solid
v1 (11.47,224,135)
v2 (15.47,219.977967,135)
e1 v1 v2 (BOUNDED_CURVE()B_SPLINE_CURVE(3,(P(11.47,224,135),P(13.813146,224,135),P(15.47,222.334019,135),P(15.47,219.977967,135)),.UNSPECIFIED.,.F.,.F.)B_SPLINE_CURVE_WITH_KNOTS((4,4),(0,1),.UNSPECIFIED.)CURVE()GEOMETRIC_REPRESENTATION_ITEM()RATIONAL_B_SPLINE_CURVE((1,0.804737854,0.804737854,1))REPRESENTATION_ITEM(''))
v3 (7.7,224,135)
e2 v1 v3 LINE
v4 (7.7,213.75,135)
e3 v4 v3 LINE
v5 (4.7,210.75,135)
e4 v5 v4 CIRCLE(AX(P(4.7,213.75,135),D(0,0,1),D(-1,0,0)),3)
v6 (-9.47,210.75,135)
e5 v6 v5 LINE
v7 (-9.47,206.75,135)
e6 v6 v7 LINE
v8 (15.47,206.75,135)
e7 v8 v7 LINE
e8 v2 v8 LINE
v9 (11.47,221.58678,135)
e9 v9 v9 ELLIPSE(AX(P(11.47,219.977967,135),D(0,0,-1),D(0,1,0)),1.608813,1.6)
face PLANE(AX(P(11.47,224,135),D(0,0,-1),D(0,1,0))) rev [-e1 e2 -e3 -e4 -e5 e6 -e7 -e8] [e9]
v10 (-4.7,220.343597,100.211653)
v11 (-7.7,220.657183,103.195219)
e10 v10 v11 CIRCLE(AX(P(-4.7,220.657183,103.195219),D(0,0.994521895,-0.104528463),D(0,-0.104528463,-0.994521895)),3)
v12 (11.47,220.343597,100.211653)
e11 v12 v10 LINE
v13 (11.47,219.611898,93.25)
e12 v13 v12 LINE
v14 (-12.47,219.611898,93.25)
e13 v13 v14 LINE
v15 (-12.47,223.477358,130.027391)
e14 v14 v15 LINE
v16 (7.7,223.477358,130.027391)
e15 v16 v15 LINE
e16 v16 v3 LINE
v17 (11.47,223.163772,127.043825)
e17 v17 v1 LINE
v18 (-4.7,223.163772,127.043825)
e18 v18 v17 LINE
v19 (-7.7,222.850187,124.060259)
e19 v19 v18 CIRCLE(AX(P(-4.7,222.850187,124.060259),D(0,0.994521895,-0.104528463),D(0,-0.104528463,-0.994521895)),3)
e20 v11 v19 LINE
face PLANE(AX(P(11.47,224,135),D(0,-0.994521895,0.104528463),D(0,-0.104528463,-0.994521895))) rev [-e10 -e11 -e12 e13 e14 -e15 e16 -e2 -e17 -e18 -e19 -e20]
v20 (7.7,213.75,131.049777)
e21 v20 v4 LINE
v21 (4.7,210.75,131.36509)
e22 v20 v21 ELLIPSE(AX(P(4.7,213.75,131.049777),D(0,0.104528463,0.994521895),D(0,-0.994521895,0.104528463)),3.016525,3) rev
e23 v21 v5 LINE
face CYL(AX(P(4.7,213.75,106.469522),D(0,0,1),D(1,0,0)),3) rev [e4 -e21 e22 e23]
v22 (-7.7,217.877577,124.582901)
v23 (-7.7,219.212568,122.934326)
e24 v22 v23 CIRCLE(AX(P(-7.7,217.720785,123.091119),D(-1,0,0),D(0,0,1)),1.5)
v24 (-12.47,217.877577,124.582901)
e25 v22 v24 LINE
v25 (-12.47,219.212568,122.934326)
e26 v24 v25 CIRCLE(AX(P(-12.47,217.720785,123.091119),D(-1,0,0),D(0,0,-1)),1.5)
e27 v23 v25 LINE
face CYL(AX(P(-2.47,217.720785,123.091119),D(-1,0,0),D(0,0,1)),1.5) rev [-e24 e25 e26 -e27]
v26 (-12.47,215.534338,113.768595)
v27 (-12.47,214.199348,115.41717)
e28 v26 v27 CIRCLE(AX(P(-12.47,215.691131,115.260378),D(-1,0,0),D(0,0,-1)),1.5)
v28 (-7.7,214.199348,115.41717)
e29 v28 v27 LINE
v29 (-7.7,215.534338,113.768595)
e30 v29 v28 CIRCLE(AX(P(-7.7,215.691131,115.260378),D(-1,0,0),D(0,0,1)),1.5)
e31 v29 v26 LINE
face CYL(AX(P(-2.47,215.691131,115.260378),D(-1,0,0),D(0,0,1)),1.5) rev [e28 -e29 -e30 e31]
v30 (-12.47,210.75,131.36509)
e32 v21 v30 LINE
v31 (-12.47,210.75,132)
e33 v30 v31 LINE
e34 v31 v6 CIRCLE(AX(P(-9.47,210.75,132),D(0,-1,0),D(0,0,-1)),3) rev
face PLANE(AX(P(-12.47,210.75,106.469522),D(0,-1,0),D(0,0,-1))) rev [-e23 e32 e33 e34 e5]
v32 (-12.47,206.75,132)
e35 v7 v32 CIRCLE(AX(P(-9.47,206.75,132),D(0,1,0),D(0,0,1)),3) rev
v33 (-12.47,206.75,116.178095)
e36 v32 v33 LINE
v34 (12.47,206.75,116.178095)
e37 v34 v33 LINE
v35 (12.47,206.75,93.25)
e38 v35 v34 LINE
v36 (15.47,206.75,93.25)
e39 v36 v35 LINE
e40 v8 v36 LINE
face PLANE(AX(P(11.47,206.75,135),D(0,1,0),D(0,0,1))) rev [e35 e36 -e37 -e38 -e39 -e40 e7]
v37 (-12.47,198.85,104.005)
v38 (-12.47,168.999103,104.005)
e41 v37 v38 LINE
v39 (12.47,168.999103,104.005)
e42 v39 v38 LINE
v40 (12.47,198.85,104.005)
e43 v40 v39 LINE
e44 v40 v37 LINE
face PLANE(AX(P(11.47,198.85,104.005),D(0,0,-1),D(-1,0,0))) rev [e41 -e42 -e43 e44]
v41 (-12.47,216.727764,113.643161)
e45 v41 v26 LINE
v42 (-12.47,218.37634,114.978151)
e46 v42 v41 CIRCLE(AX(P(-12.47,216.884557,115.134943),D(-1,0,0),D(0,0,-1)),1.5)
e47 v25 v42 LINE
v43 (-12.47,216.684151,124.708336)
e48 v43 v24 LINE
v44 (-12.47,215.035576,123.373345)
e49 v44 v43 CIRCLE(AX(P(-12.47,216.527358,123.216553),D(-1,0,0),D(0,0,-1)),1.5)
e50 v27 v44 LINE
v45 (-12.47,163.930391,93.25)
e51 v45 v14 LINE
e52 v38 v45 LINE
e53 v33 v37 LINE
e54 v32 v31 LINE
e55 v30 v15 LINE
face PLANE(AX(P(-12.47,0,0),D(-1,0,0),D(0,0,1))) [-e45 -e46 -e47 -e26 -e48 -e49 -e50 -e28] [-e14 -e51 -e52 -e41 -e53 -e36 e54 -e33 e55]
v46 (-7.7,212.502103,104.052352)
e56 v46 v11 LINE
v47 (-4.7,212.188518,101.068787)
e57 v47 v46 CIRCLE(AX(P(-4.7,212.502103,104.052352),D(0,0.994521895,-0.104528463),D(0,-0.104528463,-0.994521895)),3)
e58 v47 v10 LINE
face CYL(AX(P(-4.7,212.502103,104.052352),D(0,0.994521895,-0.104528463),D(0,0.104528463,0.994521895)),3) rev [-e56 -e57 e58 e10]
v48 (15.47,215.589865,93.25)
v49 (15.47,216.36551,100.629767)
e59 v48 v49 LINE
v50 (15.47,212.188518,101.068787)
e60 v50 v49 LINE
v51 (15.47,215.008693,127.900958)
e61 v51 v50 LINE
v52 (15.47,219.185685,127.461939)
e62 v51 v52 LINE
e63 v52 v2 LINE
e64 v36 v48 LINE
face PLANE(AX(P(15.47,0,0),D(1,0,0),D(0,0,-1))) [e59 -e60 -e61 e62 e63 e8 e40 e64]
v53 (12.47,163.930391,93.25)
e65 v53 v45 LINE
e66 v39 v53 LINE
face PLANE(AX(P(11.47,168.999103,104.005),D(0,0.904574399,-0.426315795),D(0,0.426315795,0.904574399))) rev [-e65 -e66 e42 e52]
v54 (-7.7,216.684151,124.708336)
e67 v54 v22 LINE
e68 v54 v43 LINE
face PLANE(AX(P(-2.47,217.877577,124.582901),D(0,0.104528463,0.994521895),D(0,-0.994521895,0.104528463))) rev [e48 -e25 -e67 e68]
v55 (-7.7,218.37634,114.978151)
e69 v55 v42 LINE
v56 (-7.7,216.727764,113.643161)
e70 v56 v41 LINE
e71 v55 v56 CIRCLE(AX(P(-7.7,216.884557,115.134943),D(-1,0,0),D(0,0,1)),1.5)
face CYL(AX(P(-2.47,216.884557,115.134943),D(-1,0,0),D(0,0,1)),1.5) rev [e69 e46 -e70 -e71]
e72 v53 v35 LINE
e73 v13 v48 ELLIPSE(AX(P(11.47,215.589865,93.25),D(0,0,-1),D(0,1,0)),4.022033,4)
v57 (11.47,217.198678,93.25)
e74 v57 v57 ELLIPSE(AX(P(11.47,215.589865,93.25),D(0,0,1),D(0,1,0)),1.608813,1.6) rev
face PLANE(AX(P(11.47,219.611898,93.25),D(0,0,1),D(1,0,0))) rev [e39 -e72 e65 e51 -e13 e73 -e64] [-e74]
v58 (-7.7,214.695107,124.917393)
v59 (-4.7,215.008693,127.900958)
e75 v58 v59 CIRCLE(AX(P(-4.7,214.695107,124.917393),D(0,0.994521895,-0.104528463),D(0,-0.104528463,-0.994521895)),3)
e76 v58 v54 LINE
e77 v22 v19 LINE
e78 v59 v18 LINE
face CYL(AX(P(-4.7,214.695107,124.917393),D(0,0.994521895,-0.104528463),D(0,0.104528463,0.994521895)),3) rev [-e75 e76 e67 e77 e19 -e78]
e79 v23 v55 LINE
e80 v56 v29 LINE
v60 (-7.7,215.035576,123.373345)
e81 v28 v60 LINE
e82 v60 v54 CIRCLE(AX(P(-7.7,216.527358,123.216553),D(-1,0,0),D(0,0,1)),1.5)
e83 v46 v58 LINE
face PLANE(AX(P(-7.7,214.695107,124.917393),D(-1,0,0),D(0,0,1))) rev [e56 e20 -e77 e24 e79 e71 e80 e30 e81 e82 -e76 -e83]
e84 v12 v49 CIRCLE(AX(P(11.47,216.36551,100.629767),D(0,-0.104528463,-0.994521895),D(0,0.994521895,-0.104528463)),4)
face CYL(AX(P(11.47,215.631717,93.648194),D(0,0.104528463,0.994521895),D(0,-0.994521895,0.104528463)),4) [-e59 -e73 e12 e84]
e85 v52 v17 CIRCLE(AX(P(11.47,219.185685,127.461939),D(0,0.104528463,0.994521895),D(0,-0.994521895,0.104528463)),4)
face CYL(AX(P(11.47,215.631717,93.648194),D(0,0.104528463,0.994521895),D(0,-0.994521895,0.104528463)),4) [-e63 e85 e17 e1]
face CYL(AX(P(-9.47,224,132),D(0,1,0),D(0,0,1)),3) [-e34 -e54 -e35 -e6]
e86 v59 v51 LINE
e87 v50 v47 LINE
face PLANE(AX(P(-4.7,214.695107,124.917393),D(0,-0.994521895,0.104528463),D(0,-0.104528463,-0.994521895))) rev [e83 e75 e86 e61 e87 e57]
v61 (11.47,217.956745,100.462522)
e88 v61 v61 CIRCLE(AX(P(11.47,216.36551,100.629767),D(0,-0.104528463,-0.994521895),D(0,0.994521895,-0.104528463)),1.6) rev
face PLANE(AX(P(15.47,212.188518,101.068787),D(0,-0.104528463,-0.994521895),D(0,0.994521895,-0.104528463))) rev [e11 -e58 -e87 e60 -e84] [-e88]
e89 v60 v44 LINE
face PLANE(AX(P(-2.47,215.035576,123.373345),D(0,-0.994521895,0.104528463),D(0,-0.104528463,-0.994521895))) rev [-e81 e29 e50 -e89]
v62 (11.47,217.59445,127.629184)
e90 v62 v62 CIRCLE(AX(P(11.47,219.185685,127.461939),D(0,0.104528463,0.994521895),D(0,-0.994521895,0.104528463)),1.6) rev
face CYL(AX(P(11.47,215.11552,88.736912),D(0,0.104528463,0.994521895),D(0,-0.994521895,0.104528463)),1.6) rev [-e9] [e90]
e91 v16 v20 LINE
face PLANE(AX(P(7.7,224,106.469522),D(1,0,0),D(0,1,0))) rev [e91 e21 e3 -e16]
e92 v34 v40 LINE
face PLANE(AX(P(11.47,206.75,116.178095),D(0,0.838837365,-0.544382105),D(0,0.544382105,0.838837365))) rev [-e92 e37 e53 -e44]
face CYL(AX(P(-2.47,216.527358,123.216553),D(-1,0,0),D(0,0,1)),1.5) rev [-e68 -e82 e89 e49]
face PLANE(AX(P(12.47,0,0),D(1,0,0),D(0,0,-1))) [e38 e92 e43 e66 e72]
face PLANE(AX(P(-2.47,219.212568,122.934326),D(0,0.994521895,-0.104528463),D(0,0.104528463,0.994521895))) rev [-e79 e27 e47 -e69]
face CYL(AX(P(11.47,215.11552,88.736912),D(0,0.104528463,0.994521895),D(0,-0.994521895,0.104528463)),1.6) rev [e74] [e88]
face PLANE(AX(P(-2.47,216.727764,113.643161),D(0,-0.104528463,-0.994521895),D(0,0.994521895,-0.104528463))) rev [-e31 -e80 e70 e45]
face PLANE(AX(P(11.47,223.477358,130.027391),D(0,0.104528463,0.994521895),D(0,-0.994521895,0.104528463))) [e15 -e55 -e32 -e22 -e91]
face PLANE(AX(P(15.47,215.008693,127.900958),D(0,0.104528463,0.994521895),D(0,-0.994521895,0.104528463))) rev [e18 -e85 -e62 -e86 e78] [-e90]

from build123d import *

# Parameters (mm, degrees)
EXTRUDE_START         = -12.47
EXTRUDE_1_DEPTH       = 23.94
EXTRUDE_START_2       = -42.420417041
EXTRUDE_3_DEPTH       = 42.420417041
EXTRUDE_START_3       = 135
EXTRUDE_3_2_OUTLINE_W = 5.53
EXTRUDE_3_2_OUTLINE_H = 12
EXTRUDE_3_2_DEPTH     = 1
EXTRUDE_START_4       = 92.811966442
EXTRUDE_3_3_OUTLINE_W = 5.53
EXTRUDE_3_3_OUTLINE_H = 12
EXTRUDE_3_3_DEPTH     = 0.418113953
SKETCH_3_W            = 8.92360814
SKETCH_3_H            = 8.098758973
CUT_EXTRUDE_1_DEPTH   = 24.94
EXTRUDE_4_DEPTH       = 4
EXTRUDE_5_DEPTH       = 1
FILLET_1_R            = 3
CUT_EXTRUDE_START     = -12.47
CUT_EXTRUDE_4_DEPTH   = 20.17
CUT_EXTRUDE_START_2   = 130.027390523
CUT_EXTRUDE_4_2_DEPTH = 4.972609477
CUT_EXTRUDE_5_REACH   = 78.971
SKETCH_6_R            = 1.6
CUT_EXTRUDE_6_DEPTH   = 8.2
CUT_EXTRUDE_8_DEPTH   = 10


with BuildPart() as part:
    # 草图1 → 凸台-拉伸1 (new body)
    with BuildSketch(Plane(origin=(0, 0, 0), x_dir=(0, 0, -1), z_dir=(1, 0, 0)).offset(EXTRUDE_START)):
        Polygon((-135, 224), (-135, 206.75), (-116.178095192, 206.75), (-104.005, 198.85), (-104.005, 168.99910251), (-93.25, 163.930391323), (-93.25, 219.611898178), align=None)
    extrude(amount=EXTRUDE_1_DEPTH)

    # 凸台-拉伸3: read off the stored shape, not the designer's step
    # 凸台-拉伸3 outline → 凸台-拉伸3 (add)
    with BuildSketch(Plane(origin=(11.47, 224, 135), x_dir=(1, 0, 0), z_dir=(0, 0.10452846326765014, 0.9945218953682736)).offset(EXTRUDE_START_2)):
        with BuildLine():
            Line((0, 0), (0, -4))
            Line((0, -4), (4, -4))
            ThreePointArc((4, -4), (2.828427125, -1.171572875), (0, 0))
        make_face()
    extrude(amount=EXTRUDE_3_DEPTH)

    # Extrude 3 2 outline → Extrude 3 2 (cut)
    with BuildSketch(Plane.XY.offset(EXTRUDE_START_3)):
        with Locations((14.235, 220)):
            Rectangle(EXTRUDE_3_2_OUTLINE_W, EXTRUDE_3_2_OUTLINE_H)
    extrude(amount=EXTRUDE_3_2_DEPTH, mode=Mode.SUBTRACT)

    # Extrude 3 3 outline → Extrude 3 3 (cut)
    with BuildSketch(Plane.XY.offset(EXTRUDE_START_4)):
        with Locations((14.235, 220)):
            Rectangle(EXTRUDE_3_3_OUTLINE_W, EXTRUDE_3_3_OUTLINE_H)
    extrude(amount=EXTRUDE_3_3_DEPTH, mode=Mode.SUBTRACT)

    # 草图3 → 切除-拉伸1 (cut)
    with BuildSketch(Plane(origin=(0, 0, 93.25), x_dir=(-1, 0, 0), z_dir=(0, 0, -1))):
        with Locations((-14.443820209, 216.390986059)):
            Rectangle(SKETCH_3_W, SKETCH_3_H)
    extrude(amount=CUT_EXTRUDE_1_DEPTH, mode=Mode.SUBTRACT)

    # 草图4 → 凸台-拉伸4 (add)
    with BuildSketch(Plane(origin=(11.47, 0, 0), x_dir=(0, 0, -1), z_dir=(1, 0, 0))):
        Polygon((-93.25, 206.75), (-93.25, 215.589865059), (-135, 219.977966882), (-135, 206.75), align=None)
    extrude(amount=EXTRUDE_4_DEPTH)

    # 草图10 → 凸台-拉伸5 (add)
    with BuildSketch(Plane(origin=(11.47, 0, 0), x_dir=(0, 0, -1), z_dir=(1, 0, 0))):
        Polygon((-93.25, 163.930391323), (-104.005, 168.99910251), (-104.005, 198.85), (-116.178095192, 206.75), (-93.25, 206.75), align=None)
    extrude(amount=EXTRUDE_5_DEPTH)

    # 圆角1
    fillet_1_edges = [part.edges().sort_by_distance(p)[0] for p in [
        (-12.47, 215.375, 135),
    ]]
    fillet(fillet_1_edges, radius=FILLET_1_R)

    # 切除-拉伸4: read off the stored shape, not the designer's step
    # 切除-拉伸4 outline → 切除-拉伸4 (cut)
    with BuildSketch(Plane.YZ.offset(CUT_EXTRUDE_START)):
        Polygon((210.75, 131.365089719), (223.477357684, 130.027390523), (224, 135), (210.75, 135), align=None)
    extrude(amount=CUT_EXTRUDE_4_DEPTH, mode=Mode.SUBTRACT)

    # Cut-Extrude 4 2 outline → Cut-Extrude 4 2 (add)
    with BuildSketch(Plane.XY.offset(CUT_EXTRUDE_START_2)):
        with BuildLine():
            ThreePointArc((7.7, 213.75), (6.821320344, 211.628679656), (4.7, 210.75))
            Line((4.7, 210.75), (7.7, 210.75))
            Line((7.7, 210.75), (7.7, 213.75))
        make_face()
    extrude(amount=CUT_EXTRUDE_4_2_DEPTH)

    # 切除-拉伸5: up to this plane
    cut_extrude_5_end = Plane(origin=(11.47, 219.611898178, 93.25), z_dir=(0, 0, 1))
    # 草图6 → 切除-拉伸5 (cut, up to the surface)
    with BuildSketch(Plane(origin=(11.47, 224, 135), x_dir=(1, 0, 0), z_dir=(0, 0.10452846326765014, 0.9945218953682736)), mode=Mode.PRIVATE) as cut_extrude_5_sk1:
        with Locations(Location((0, -4, 0), (0, 0, 90))):
            Circle(SKETCH_6_R)
    cut_extrude_5_tool1 = split(extrude(cut_extrude_5_sk1.sketch, amount=-CUT_EXTRUDE_5_REACH, mode=Mode.PRIVATE), bisect_by=cut_extrude_5_end, keep=Keep.BOTH, mode=Mode.PRIVATE)
    add(cut_extrude_5_tool1.solids().sort_by_distance((11.47, 220.021912, 135.418114))[0], mode=Mode.SUBTRACT)

    # 草图7 → 切除-拉伸6 (cut)
    with BuildSketch(Plane(origin=(0, 207.518492152, -21.811072421), x_dir=(1, 0, 0), z_dir=(0, 0.9945218953682738, -0.10452846326765014))):
        with BuildLine():
            Line((15.47, -149.674831647), (15.47, -122.694860975))
            Line((15.47, -122.694860975), (-4.7, -122.694860975))
            ThreePointArc((-4.7, -122.694860975), (-6.821320344, -123.573540631), (-7.7, -125.694860975))
            Line((-7.7, -125.694860975), (-7.7, -146.674831647))
            ThreePointArc((-7.7, -146.674831647), (-6.821320344, -148.79615199), (-4.7, -149.674831647))
            Line((-4.7, -149.674831647), (15.47, -149.674831647))
        make_face()
    extrude(amount=-CUT_EXTRUDE_6_DEPTH, mode=Mode.SUBTRACT)

    # 草图9 → 切除-拉伸8 (cut)
    with BuildSketch(Plane.ZY.offset(12.47)):
        with BuildLine():
            Line((122.934325929, 219.212567575), (114.978150766, 218.376339869))
            ThreePointArc((114.978150766, 218.376339869), (113.969224519, 217.828537613), (113.643160618, 216.727764331))
            Line((113.643160618, 216.727764331), (113.768594774, 215.534338057))
            ThreePointArc((113.768594774, 215.534338057), (114.316397031, 214.52541181), (115.417170312, 214.199347909))
            Line((115.417170312, 214.199347909), (123.373345475, 215.035575615))
            ThreePointArc((123.373345475, 215.035575615), (124.382271722, 215.583377871), (124.708335623, 216.684151153))
            Line((124.708335623, 216.684151153), (124.582901467, 217.877577427))
            ThreePointArc((124.582901467, 217.877577427), (124.035099211, 218.886503674), (122.934325929, 219.212567575))
        make_face()
    extrude(amount=-CUT_EXTRUDE_8_DEPTH, mode=Mode.SUBTRACT)


solid = part.part
